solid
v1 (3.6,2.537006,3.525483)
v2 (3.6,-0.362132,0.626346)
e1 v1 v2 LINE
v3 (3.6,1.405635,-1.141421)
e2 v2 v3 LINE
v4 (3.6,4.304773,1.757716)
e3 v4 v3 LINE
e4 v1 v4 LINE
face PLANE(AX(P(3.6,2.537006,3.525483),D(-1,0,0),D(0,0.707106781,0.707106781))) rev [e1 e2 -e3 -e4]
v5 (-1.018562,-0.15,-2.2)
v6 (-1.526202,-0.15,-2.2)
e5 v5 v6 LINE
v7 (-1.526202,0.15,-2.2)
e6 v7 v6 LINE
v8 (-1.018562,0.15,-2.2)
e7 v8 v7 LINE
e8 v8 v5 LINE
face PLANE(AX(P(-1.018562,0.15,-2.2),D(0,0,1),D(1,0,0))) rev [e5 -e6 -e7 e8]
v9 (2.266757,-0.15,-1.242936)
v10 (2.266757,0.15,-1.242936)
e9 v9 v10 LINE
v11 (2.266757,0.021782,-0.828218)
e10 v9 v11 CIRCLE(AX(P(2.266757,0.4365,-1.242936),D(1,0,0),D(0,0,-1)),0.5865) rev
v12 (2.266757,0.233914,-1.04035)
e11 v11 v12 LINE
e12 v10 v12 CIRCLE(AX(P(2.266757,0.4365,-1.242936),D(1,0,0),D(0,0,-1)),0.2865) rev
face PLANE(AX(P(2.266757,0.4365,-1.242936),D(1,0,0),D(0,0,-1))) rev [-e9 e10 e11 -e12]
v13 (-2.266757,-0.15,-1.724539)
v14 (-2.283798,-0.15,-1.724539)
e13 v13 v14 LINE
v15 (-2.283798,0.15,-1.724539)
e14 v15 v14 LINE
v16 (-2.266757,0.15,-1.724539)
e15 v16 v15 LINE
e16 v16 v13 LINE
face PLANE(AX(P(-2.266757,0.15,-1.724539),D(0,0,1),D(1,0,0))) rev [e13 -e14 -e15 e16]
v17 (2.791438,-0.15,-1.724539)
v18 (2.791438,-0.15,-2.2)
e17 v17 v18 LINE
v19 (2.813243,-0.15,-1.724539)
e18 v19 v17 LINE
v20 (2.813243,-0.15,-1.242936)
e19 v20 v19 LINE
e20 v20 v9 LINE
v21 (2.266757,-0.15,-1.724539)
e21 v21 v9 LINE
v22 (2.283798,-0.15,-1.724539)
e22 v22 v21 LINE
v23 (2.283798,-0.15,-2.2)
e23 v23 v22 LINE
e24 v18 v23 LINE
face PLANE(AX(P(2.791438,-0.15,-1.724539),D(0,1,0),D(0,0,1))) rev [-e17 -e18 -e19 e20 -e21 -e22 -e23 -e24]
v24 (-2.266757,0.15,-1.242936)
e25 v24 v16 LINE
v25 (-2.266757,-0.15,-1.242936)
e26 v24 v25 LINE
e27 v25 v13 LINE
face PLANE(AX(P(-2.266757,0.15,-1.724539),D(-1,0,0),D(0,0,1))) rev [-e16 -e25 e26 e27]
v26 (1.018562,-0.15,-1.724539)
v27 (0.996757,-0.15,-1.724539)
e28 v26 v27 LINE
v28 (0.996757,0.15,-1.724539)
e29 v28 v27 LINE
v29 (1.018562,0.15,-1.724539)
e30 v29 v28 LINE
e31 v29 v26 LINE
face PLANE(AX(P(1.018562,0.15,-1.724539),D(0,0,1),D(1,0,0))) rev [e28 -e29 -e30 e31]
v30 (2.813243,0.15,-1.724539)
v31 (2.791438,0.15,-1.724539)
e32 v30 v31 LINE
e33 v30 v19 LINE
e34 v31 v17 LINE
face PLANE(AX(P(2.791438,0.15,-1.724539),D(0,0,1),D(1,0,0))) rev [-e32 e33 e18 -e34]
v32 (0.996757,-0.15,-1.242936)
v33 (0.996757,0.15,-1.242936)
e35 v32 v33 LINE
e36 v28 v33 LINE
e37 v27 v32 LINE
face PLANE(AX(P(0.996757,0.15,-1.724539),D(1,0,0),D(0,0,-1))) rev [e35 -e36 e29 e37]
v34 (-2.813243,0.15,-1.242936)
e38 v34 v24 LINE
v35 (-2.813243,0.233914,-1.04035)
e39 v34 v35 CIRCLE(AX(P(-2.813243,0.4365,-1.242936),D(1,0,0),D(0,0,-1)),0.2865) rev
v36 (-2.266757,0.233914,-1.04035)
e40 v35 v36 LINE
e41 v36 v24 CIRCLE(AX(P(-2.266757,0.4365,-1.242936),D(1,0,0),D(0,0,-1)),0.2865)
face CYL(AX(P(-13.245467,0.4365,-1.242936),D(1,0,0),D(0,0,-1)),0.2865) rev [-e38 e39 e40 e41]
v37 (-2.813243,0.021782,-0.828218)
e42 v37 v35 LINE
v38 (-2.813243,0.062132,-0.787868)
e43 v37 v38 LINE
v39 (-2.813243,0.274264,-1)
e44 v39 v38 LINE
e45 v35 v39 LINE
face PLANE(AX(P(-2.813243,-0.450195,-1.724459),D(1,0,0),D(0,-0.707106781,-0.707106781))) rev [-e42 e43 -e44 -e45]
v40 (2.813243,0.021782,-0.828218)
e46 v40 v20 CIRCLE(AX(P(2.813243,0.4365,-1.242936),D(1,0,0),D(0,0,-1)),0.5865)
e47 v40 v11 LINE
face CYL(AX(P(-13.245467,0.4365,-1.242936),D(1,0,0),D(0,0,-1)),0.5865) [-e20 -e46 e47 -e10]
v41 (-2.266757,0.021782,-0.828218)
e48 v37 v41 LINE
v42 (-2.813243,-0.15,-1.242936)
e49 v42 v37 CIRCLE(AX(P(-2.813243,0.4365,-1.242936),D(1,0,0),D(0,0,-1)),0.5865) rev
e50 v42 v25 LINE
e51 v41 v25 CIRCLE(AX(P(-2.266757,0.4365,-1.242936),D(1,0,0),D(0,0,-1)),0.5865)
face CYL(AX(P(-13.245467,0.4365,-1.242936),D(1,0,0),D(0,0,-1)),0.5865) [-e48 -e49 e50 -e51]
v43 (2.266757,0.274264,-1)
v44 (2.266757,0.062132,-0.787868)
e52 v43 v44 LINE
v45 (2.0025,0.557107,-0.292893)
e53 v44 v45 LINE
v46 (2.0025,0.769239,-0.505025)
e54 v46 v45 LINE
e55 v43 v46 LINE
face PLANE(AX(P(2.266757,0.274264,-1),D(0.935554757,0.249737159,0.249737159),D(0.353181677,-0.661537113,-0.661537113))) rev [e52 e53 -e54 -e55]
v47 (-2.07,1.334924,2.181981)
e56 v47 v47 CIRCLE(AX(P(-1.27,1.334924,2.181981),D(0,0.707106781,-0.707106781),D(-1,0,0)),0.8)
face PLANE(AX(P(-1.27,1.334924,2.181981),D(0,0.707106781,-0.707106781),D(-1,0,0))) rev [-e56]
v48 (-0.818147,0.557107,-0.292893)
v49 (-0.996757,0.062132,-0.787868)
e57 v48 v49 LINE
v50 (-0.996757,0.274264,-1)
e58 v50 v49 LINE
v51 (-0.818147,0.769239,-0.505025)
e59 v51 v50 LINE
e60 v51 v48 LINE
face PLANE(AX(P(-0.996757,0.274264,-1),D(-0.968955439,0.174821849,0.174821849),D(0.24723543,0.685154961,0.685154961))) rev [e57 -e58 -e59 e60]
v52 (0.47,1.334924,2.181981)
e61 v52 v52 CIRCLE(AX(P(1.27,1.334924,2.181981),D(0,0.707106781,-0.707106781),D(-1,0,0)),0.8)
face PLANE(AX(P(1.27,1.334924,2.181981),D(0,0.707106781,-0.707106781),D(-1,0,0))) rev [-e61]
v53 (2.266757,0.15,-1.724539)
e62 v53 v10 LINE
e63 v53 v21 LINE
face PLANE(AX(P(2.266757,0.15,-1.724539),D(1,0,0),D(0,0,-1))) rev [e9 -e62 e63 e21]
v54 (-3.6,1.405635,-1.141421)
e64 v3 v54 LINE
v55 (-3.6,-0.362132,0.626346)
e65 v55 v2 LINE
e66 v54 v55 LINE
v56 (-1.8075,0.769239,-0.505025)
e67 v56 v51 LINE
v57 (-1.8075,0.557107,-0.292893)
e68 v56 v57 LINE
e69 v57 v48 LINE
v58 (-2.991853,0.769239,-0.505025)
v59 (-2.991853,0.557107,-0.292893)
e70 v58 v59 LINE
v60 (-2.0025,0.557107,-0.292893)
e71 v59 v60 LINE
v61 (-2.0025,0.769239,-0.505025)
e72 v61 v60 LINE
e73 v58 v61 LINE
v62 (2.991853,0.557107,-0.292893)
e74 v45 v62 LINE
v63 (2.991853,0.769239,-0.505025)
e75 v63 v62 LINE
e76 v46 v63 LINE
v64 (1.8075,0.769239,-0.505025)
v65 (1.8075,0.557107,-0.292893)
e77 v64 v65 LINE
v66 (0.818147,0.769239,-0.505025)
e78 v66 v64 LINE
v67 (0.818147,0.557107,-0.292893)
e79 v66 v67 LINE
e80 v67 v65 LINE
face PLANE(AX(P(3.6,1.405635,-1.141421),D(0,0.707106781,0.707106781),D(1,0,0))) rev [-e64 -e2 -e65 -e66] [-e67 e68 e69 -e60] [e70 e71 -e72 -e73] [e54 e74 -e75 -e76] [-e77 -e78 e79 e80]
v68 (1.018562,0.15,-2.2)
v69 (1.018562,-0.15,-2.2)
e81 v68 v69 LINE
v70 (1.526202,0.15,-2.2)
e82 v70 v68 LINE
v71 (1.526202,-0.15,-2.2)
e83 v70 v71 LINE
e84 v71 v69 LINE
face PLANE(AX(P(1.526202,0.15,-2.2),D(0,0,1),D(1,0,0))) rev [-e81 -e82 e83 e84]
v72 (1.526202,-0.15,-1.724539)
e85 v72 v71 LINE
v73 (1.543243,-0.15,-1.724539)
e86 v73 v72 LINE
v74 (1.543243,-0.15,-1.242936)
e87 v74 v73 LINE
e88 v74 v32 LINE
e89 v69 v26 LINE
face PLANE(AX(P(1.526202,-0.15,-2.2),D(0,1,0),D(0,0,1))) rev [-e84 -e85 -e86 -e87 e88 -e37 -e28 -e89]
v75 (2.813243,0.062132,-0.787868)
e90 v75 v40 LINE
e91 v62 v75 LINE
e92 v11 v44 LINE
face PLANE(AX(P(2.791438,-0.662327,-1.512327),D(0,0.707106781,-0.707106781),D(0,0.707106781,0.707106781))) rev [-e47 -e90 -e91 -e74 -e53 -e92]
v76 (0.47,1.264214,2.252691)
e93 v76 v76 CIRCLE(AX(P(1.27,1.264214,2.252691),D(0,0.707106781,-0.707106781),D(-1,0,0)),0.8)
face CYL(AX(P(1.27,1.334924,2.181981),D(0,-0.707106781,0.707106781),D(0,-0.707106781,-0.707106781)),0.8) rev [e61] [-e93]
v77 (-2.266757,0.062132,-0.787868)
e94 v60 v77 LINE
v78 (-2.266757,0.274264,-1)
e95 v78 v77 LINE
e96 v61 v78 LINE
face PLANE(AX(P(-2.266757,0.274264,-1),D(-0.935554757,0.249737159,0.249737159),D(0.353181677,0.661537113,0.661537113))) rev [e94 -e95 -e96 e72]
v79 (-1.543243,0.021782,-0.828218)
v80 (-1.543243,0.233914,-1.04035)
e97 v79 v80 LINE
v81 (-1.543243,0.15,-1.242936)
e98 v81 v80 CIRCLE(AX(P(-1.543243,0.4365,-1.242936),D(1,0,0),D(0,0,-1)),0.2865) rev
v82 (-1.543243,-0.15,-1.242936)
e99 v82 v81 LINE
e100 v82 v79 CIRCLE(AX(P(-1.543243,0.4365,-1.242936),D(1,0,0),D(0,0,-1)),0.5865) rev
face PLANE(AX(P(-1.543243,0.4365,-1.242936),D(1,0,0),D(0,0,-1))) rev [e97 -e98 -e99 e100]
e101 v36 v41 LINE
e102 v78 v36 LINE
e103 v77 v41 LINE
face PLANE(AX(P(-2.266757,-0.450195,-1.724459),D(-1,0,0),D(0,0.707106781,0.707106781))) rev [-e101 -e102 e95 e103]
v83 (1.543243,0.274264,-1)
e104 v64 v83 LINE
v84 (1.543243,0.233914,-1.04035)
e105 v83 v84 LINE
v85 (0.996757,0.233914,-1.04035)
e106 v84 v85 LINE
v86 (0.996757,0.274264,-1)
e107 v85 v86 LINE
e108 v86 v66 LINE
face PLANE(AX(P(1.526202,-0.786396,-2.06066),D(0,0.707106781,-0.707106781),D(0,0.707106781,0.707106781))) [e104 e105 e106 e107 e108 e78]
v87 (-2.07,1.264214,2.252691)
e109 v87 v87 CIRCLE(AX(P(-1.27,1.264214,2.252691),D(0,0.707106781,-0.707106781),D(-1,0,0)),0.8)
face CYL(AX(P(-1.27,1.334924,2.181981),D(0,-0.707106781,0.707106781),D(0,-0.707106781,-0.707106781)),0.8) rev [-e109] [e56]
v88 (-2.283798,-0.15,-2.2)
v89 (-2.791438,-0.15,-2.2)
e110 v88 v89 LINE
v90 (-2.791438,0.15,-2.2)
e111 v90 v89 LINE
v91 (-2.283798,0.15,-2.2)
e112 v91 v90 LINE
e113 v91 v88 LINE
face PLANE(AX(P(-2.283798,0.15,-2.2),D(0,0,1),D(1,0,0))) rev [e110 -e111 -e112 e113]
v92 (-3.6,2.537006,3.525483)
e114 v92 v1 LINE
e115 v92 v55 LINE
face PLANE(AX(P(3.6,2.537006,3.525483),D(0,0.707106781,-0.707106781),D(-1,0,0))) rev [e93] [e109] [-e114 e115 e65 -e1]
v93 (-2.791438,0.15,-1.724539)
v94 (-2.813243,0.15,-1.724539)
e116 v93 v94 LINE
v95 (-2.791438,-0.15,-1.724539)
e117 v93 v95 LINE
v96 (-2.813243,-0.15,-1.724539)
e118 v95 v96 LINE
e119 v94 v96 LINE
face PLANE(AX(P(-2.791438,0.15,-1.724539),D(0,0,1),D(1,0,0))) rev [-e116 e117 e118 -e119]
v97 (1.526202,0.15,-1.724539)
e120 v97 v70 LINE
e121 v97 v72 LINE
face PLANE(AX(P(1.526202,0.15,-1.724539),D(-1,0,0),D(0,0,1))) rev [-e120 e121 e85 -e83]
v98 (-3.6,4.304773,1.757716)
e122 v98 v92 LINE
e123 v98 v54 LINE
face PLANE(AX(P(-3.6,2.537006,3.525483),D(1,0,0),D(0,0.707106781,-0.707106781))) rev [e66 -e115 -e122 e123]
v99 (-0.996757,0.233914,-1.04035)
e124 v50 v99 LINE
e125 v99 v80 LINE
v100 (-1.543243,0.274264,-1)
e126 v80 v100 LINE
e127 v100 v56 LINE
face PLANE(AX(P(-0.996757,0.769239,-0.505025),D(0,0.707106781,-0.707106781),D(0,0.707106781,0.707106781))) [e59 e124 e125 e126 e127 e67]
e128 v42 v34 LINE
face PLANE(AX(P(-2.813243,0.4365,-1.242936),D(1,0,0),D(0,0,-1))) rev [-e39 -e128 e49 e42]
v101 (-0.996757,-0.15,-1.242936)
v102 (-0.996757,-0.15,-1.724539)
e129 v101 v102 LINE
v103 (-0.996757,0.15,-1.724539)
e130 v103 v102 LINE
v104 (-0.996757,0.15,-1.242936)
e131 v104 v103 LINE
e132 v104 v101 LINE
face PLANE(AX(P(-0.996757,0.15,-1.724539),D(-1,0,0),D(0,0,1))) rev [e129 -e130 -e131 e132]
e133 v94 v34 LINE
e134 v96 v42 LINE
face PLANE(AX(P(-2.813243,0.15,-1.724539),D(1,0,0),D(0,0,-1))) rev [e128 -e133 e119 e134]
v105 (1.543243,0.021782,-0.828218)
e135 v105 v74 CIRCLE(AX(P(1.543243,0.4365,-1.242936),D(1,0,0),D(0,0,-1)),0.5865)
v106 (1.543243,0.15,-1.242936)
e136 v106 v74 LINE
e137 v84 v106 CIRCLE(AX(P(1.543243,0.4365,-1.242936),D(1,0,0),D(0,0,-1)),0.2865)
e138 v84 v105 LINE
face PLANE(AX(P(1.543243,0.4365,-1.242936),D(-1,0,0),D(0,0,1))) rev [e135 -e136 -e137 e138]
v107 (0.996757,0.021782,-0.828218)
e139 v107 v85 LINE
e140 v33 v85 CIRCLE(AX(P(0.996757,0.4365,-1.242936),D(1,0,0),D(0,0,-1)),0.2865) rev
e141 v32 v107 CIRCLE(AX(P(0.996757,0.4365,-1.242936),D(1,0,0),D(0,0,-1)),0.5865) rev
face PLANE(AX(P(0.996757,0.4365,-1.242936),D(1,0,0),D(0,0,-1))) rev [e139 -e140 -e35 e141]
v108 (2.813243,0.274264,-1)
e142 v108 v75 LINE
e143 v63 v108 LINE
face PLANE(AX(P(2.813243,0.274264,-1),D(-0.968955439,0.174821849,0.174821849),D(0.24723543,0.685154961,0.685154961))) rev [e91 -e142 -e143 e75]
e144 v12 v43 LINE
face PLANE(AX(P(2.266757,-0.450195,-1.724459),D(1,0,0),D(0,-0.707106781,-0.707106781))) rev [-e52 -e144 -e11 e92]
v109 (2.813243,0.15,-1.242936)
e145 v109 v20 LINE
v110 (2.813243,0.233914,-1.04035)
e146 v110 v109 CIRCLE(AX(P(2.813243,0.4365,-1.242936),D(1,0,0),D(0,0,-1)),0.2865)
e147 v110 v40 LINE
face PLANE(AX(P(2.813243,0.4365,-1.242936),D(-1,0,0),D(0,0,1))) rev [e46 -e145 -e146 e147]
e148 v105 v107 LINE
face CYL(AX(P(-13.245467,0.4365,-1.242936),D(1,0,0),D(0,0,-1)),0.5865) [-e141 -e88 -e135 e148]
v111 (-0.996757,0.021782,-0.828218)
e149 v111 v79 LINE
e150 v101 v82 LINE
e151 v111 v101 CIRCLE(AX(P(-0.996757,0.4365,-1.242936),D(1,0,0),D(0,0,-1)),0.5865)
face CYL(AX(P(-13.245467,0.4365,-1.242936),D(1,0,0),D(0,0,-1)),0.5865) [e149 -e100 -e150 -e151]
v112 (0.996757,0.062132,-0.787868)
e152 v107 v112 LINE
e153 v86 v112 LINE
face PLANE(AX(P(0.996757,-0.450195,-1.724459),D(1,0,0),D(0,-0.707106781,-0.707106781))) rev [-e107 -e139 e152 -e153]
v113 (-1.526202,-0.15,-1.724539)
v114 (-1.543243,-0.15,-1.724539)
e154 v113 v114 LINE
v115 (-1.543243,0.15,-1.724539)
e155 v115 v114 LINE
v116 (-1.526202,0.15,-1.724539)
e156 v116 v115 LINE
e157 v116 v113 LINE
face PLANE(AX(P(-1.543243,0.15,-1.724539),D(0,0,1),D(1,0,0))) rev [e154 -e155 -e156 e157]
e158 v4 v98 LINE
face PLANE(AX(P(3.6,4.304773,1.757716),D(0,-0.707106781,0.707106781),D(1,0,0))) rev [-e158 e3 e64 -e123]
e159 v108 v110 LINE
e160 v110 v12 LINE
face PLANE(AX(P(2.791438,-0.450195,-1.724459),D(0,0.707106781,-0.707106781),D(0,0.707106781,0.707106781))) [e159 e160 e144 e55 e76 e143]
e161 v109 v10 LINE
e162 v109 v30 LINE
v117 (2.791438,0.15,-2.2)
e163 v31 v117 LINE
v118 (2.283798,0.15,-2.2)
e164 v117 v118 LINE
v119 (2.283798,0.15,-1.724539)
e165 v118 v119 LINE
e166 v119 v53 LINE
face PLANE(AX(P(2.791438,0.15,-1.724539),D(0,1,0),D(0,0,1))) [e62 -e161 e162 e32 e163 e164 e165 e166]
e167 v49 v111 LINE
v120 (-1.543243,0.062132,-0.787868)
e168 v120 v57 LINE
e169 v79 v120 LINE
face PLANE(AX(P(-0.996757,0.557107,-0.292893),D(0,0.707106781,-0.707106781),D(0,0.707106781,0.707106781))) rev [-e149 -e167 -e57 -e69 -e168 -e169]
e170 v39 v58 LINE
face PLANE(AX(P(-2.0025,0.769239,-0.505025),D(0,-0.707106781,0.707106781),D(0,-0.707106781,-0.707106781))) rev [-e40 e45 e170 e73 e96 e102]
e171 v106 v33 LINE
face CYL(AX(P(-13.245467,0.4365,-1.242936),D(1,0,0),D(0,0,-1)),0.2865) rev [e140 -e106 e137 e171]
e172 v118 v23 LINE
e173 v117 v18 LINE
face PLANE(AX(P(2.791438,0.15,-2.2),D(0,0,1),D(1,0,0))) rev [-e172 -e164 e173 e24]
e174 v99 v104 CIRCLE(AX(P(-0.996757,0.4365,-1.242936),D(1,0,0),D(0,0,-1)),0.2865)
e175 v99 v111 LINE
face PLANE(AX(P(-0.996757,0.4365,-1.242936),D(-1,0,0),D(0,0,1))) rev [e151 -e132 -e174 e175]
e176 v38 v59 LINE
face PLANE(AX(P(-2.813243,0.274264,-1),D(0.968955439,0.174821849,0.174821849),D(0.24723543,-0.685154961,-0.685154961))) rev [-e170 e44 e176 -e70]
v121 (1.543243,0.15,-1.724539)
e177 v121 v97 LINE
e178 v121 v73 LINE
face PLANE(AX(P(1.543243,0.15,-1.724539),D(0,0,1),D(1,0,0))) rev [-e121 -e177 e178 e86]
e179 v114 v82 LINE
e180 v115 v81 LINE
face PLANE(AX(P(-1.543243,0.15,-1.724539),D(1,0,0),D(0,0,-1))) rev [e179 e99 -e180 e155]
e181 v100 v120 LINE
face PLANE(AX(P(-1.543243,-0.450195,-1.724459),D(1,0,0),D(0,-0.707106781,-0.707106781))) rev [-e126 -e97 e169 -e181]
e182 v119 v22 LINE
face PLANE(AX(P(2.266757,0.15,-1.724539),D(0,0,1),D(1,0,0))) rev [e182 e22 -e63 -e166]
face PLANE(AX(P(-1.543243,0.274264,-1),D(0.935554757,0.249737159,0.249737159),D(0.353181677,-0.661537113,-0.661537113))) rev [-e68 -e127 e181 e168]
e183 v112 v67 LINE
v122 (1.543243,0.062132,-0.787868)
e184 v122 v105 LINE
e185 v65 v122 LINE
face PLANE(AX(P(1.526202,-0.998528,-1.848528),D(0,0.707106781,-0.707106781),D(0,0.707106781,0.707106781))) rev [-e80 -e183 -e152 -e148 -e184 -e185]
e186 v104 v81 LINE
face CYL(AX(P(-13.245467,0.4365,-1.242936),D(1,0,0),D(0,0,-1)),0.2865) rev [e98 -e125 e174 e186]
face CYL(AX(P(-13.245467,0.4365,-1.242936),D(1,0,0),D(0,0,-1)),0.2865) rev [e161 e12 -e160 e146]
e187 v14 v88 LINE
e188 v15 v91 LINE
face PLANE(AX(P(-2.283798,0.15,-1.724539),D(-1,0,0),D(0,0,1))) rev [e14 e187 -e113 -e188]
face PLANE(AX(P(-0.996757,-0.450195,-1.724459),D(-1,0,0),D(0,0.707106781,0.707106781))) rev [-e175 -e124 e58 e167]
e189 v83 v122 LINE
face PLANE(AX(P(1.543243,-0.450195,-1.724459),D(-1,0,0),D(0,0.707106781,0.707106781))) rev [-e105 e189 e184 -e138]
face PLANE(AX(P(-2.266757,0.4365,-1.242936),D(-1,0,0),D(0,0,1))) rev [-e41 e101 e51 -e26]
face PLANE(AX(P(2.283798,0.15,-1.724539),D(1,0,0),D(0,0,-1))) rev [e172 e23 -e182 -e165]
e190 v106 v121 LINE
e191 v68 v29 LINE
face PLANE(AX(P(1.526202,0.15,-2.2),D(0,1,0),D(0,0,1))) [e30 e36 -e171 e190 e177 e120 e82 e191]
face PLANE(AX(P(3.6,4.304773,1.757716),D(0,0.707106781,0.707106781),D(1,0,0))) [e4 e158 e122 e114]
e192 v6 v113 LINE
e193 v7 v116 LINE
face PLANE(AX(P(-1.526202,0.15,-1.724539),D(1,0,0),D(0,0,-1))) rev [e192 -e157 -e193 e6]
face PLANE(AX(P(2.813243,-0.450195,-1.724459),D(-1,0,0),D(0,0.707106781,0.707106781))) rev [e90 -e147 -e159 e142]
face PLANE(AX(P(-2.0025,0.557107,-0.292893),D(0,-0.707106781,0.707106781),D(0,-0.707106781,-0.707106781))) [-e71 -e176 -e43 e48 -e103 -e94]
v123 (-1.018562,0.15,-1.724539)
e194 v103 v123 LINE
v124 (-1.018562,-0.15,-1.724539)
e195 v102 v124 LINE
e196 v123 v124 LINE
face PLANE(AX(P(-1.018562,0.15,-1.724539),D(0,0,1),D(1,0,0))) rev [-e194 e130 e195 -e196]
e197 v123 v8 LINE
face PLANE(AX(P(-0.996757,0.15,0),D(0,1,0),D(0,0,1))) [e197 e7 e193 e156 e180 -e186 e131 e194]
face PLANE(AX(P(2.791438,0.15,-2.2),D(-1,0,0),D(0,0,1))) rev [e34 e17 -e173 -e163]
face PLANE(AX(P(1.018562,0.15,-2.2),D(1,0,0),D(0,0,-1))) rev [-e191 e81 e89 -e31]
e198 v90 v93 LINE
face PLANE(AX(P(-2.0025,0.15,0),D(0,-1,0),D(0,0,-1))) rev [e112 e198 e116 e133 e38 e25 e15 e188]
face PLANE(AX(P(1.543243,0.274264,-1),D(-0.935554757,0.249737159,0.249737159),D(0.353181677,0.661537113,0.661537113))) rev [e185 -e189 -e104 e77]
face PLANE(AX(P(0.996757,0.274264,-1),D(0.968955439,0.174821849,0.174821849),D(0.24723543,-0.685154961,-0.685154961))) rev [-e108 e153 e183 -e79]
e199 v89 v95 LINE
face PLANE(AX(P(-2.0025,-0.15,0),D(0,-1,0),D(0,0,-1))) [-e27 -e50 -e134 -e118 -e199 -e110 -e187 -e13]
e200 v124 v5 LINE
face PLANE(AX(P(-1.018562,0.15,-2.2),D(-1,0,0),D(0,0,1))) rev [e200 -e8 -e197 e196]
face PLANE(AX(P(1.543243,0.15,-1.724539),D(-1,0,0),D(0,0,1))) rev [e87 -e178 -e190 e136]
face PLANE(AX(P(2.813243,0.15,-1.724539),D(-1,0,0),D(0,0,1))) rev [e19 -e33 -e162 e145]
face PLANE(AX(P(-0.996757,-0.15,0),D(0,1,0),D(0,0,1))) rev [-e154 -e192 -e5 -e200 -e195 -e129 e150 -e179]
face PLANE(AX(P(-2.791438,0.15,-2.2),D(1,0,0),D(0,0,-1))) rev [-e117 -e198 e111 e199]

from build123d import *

# Parameters (mm, degrees)
ESQUISSE2_W          = 7.2
ESQUISSE2_H          = 2.5
BOITIER_DEPTH        = 4.1
FENETRECAPTEUR_START = -1.45
ESQUISSE4_R          = 0.8
FENETRECAPTEUR_DEPTH = 0.1
PATTES_DEPTH         = 0.15
PLIAGE_START         = -5
PLIAGE_1_OUTLINE_W   = 7.2
PLIAGE_1_OUTLINE_H   = 4.1
PLIAGE_1_DEPTH       = 4.301040764
PLIAGE_START_2       = -0.698959236
PLIAGE_1_2_OUTLINE_R = 0.8
PLIAGE_1_2_DEPTH     = 0.1
PLIAGE_START_3       = -0.598959236
PLIAGE_1_3_OUTLINE_W = 7.2
PLIAGE_1_3_OUTLINE_H = 4.1
PLIAGE_1_3_DEPTH     = 2.4
PLIAGE_1_4_OUTLINE_W = 7.2
PLIAGE_1_4_OUTLINE_H = 4.1
PLIAGE_1_4_OUTLINE_R = 0.8
PLIAGE_1_4_DEPTH     = 0.1
PLIAGE_START_4       = -3.6
PLIAGE_1_5_DEPTH     = 7.2
PLIAGE_START_5       = -2.813242849
PLIAGE_1_6_DEPTH     = 0.546485698
PLIAGE_START_6       = -1.543242849
PLIAGE_1_7_DEPTH     = 0.546485698
PLIAGE_START_7       = 0.996757151
PLIAGE_1_8_DEPTH     = 0.546485698
PLIAGE_START_8       = 2.266757151
PLIAGE_1_9_DEPTH     = 0.546485698
PLIAGE_START_9       = 0.601040763
PLIAGE_1_10_DEPTH    = 0.300000001


with BuildPart() as part:
    # Esquisse2 → Boitier (new body)
    with BuildSketch(Plane.XY):
        with Locations((0, -0.2)):
            Rectangle(ESQUISSE2_W, ESQUISSE2_H)
    extrude(amount=BOITIER_DEPTH)

    # Esquisse4 → FenetreCapteur (cut)
    with BuildSketch(Plane(origin=(0, 0, 0), x_dir=(1, 0, 0), z_dir=(0, 1, 0)).offset(FENETRECAPTEUR_START)):
        with Locations(Location((-1.27, -2.3, 0), (0, 0, 180))):
            Circle(ESQUISSE4_R)
        with Locations(Location((1.27, -2.3, 0), (0, 0, 180))):
            Circle(ESQUISSE4_R)
    extrude(amount=FENETRECAPTEUR_DEPTH, mode=Mode.SUBTRACT)

    # Esquisse5 → Pattes (add, symmetric)
    with BuildSketch(Plane(origin=(0, 0, 0), x_dir=(1, 0, 0), z_dir=(0, 1, 0))):
        Polygon((2.791437744, 2.2), (2.283797649, 2.2), (2.283797649, 1.724539267), (2.266757151, 1.724539267), (2.266757151, 0.7), (2.002499851, 0), (2.991852509, 0), (2.813242849, 0.7), (2.813242849, 1.724539267), (2.791437744, 1.724539267), align=None)
        Polygon((1.526202351, 2.2), (1.018562256, 2.2), (1.018562256, 1.724539267), (0.996757151, 1.724539267), (0.996757151, 0.7), (0.818147491, 0), (1.807500149, 0), (1.543242849, 0.7), (1.543242849, 1.724539267), (1.526202351, 1.724539267), align=None)
        Polygon((-1.018562256, 2.2), (-1.526202351, 2.2), (-1.526202351, 1.724539267), (-1.543242849, 1.724539267), (-1.543242849, 0.7), (-1.807500149, 0), (-0.818147491, 0), (-0.996757151, 0.7), (-0.996757151, 1.724539267), (-1.018562256, 1.724539267), align=None)
        Polygon((-2.283797649, 2.2), (-2.791437744, 2.2), (-2.791437744, 1.724539267), (-2.813242849, 1.724539267), (-2.813242849, 0.7), (-2.991852509, 0), (-2.002499851, 0), (-2.266757151, 0.7), (-2.266757151, 1.724539267), (-2.283797649, 1.724539267), align=None)
    extrude(amount=PATTES_DEPTH, both=True)

    # Pliage 1: read off the stored shape, not the designer's step
    # Pliage 1 outline → Pliage 1 (cut)
    with BuildSketch(Plane(origin=(0, 0, 0), x_dir=(1, 0, 0), z_dir=(0, 0.707106781186546, -0.707106781186549)).offset(PLIAGE_START)):
        with Locations((0, -2.236827202)):
            Rectangle(PLIAGE_1_OUTLINE_W, PLIAGE_1_OUTLINE_H)
    extrude(amount=PLIAGE_1_DEPTH, mode=Mode.SUBTRACT)

    # Pliage 1 2 outline → Pliage 1 2 (cut)
    with BuildSketch(Plane(origin=(0, 0, 0), x_dir=(1, 0, 0), z_dir=(0, 0.707106781186546, -0.707106781186549)).offset(PLIAGE_START_2)):
        with Locations((-1.27, -2.486827202)):
            Circle(PLIAGE_1_2_OUTLINE_R)
        with Locations((1.27, -2.486827202)):
            Circle(PLIAGE_1_2_OUTLINE_R)
    extrude(amount=PLIAGE_1_2_DEPTH, mode=Mode.SUBTRACT)

    # Pliage 1 3 outline → Pliage 1 3 (add)
    with BuildSketch(Plane(origin=(0, 0, 0), x_dir=(1, 0, 0), z_dir=(0, 0.707106781186546, -0.707106781186549)).offset(PLIAGE_START_3)):
        with Locations((0, -2.236827202)):
            Rectangle(PLIAGE_1_3_OUTLINE_W, PLIAGE_1_3_OUTLINE_H)
    extrude(amount=PLIAGE_1_3_DEPTH)

    # Pliage 1 4 outline → Pliage 1 4 (add)
    with BuildSketch(Plane(origin=(0, 0, 0), x_dir=(1, 0, 0), z_dir=(0, 0.707106781186546, -0.707106781186549)).offset(PLIAGE_START_2)):
        with Locations((0, -2.236827202)):
            Rectangle(PLIAGE_1_4_OUTLINE_W, PLIAGE_1_4_OUTLINE_H)
        with Locations((-1.27, -2.486827202)):
            Circle(PLIAGE_1_4_OUTLINE_R, mode=Mode.SUBTRACT)
        with Locations((1.27, -2.486827202)):
            Circle(PLIAGE_1_4_OUTLINE_R, mode=Mode.SUBTRACT)
    extrude(amount=PLIAGE_1_4_DEPTH)

    # Pliage 1 5 outline → Pliage 1 5 (cut)
    with BuildSketch(Plane.YZ.offset(PLIAGE_START_4)):
        with BuildLine():
            Line((0.021781873, -0.828218127), (0.15, -0.7))
            Line((0.15, -0.7), (0.15, 0))
            Line((0.15, 0), (0.264213563, 0))
            Line((0.264213563, 0), (-1.35, 1.614213563))
            Line((-1.35, 1.614213563), (-1.45, 1.714213563))
            Line((-1.45, 1.714213563), (-1.45, 0))
            Line((-1.45, 0), (-0.15, 0))
            Line((-0.15, 0), (-0.15, -1.242936254))
            ThreePointArc((-0.15, -1.242936254), (-0.105355346, -1.018492421), (0.021781873, -0.828218127))
        make_face()
    extrude(amount=PLIAGE_1_5_DEPTH, mode=Mode.SUBTRACT)

    # Pliage 1 6 outline → Pliage 1 6 (add)
    with BuildSketch(Plane.YZ.offset(PLIAGE_START_5)):
        with BuildLine():
            Line((0.769238816, -0.505025253), (0.557106781, -0.292893218))
            Line((0.557106781, -0.292893218), (0.15, -0.7))
            Line((0.15, -0.7), (0.15, -1.242936254))
            ThreePointArc((0.15, -1.242936254), (0.171808514, -1.133297451), (0.233913907, -1.040350162))
            Line((0.233913907, -1.040350162), (0.769238816, -0.505025253))
        make_face()
    extrude(amount=PLIAGE_1_6_DEPTH)

    # Pliage 1 7 outline → Pliage 1 7 (add)
    with BuildSketch(Plane.YZ.offset(PLIAGE_START_6)):
        with BuildLine():
            Line((0.769238816, -0.505025253), (0.557106781, -0.292893218))
            Line((0.557106781, -0.292893218), (0.15, -0.7))
            Line((0.15, -0.7), (0.15, -1.242936254))
            ThreePointArc((0.15, -1.242936254), (0.171808514, -1.133297451), (0.233913907, -1.040350162))
            Line((0.233913907, -1.040350162), (0.769238816, -0.505025253))
        make_face()
    extrude(amount=PLIAGE_1_7_DEPTH)

    # Pliage 1 8 outline → Pliage 1 8 (add)
    with BuildSketch(Plane.YZ.offset(PLIAGE_START_7)):
        with BuildLine():
            Line((0.769238816, -0.505025253), (0.557106781, -0.292893218))
            Line((0.557106781, -0.292893218), (0.15, -0.7))
            Line((0.15, -0.7), (0.15, -1.242936254))
            ThreePointArc((0.15, -1.242936254), (0.171808514, -1.133297451), (0.233913907, -1.040350162))
            Line((0.233913907, -1.040350162), (0.769238816, -0.505025253))
        make_face()
    extrude(amount=PLIAGE_1_8_DEPTH)

    # Pliage 1 9 outline → Pliage 1 9 (add)
    with BuildSketch(Plane.YZ.offset(PLIAGE_START_8)):
        with BuildLine():
            Line((0.769238816, -0.505025253), (0.557106781, -0.292893218))
            Line((0.557106781, -0.292893218), (0.15, -0.7))
            Line((0.15, -0.7), (0.15, -1.242936254))
            ThreePointArc((0.15, -1.242936254), (0.171808514, -1.133297451), (0.233913907, -1.040350162))
            Line((0.233913907, -1.040350162), (0.769238816, -0.505025253))
        make_face()
    extrude(amount=PLIAGE_1_9_DEPTH)

    # Pliage 1 10 outline → Pliage 1 10 (add)
    with BuildSketch(Plane(origin=(0, 0, 0), x_dir=(1, 0, 0), z_dir=(0, 0.707106781186546, -0.707106781186549)).offset(PLIAGE_START_9)):
        Polygon((2.813242849, 0.513172798), (2.813242849, -0.186827202), (2.991852509, -0.186827202), align=None)
        Polygon((-2.991852509, -0.186827202), (-2.813242849, -0.186827202), (-2.813242849, 0.513172798), align=None)
        Polygon((-2.266757151, -0.186827202), (-2.002499851, -0.186827202), (-2.266757151, 0.513172798), align=None)
        Polygon((-1.807500149, -0.186827202), (-1.543242849, -0.186827202), (-1.543242849, 0.513172798), align=None)
        Polygon((-0.996757151, -0.186827202), (-0.818147491, -0.186827202), (-0.996757151, 0.513172798), align=None)
        Polygon((0.818147491, -0.186827202), (0.996757151, -0.186827202), (0.996757151, 0.513172798), align=None)
        Polygon((1.543242849, -0.186827202), (1.807500149, -0.186827202), (1.543242849, 0.513172798), align=None)
        Polygon((2.266757151, 0.513172798), (2.002499851, -0.186827202), (2.266757151, -0.186827202), align=None)
    extrude(amount=PLIAGE_1_10_DEPTH)


solid = part.part
